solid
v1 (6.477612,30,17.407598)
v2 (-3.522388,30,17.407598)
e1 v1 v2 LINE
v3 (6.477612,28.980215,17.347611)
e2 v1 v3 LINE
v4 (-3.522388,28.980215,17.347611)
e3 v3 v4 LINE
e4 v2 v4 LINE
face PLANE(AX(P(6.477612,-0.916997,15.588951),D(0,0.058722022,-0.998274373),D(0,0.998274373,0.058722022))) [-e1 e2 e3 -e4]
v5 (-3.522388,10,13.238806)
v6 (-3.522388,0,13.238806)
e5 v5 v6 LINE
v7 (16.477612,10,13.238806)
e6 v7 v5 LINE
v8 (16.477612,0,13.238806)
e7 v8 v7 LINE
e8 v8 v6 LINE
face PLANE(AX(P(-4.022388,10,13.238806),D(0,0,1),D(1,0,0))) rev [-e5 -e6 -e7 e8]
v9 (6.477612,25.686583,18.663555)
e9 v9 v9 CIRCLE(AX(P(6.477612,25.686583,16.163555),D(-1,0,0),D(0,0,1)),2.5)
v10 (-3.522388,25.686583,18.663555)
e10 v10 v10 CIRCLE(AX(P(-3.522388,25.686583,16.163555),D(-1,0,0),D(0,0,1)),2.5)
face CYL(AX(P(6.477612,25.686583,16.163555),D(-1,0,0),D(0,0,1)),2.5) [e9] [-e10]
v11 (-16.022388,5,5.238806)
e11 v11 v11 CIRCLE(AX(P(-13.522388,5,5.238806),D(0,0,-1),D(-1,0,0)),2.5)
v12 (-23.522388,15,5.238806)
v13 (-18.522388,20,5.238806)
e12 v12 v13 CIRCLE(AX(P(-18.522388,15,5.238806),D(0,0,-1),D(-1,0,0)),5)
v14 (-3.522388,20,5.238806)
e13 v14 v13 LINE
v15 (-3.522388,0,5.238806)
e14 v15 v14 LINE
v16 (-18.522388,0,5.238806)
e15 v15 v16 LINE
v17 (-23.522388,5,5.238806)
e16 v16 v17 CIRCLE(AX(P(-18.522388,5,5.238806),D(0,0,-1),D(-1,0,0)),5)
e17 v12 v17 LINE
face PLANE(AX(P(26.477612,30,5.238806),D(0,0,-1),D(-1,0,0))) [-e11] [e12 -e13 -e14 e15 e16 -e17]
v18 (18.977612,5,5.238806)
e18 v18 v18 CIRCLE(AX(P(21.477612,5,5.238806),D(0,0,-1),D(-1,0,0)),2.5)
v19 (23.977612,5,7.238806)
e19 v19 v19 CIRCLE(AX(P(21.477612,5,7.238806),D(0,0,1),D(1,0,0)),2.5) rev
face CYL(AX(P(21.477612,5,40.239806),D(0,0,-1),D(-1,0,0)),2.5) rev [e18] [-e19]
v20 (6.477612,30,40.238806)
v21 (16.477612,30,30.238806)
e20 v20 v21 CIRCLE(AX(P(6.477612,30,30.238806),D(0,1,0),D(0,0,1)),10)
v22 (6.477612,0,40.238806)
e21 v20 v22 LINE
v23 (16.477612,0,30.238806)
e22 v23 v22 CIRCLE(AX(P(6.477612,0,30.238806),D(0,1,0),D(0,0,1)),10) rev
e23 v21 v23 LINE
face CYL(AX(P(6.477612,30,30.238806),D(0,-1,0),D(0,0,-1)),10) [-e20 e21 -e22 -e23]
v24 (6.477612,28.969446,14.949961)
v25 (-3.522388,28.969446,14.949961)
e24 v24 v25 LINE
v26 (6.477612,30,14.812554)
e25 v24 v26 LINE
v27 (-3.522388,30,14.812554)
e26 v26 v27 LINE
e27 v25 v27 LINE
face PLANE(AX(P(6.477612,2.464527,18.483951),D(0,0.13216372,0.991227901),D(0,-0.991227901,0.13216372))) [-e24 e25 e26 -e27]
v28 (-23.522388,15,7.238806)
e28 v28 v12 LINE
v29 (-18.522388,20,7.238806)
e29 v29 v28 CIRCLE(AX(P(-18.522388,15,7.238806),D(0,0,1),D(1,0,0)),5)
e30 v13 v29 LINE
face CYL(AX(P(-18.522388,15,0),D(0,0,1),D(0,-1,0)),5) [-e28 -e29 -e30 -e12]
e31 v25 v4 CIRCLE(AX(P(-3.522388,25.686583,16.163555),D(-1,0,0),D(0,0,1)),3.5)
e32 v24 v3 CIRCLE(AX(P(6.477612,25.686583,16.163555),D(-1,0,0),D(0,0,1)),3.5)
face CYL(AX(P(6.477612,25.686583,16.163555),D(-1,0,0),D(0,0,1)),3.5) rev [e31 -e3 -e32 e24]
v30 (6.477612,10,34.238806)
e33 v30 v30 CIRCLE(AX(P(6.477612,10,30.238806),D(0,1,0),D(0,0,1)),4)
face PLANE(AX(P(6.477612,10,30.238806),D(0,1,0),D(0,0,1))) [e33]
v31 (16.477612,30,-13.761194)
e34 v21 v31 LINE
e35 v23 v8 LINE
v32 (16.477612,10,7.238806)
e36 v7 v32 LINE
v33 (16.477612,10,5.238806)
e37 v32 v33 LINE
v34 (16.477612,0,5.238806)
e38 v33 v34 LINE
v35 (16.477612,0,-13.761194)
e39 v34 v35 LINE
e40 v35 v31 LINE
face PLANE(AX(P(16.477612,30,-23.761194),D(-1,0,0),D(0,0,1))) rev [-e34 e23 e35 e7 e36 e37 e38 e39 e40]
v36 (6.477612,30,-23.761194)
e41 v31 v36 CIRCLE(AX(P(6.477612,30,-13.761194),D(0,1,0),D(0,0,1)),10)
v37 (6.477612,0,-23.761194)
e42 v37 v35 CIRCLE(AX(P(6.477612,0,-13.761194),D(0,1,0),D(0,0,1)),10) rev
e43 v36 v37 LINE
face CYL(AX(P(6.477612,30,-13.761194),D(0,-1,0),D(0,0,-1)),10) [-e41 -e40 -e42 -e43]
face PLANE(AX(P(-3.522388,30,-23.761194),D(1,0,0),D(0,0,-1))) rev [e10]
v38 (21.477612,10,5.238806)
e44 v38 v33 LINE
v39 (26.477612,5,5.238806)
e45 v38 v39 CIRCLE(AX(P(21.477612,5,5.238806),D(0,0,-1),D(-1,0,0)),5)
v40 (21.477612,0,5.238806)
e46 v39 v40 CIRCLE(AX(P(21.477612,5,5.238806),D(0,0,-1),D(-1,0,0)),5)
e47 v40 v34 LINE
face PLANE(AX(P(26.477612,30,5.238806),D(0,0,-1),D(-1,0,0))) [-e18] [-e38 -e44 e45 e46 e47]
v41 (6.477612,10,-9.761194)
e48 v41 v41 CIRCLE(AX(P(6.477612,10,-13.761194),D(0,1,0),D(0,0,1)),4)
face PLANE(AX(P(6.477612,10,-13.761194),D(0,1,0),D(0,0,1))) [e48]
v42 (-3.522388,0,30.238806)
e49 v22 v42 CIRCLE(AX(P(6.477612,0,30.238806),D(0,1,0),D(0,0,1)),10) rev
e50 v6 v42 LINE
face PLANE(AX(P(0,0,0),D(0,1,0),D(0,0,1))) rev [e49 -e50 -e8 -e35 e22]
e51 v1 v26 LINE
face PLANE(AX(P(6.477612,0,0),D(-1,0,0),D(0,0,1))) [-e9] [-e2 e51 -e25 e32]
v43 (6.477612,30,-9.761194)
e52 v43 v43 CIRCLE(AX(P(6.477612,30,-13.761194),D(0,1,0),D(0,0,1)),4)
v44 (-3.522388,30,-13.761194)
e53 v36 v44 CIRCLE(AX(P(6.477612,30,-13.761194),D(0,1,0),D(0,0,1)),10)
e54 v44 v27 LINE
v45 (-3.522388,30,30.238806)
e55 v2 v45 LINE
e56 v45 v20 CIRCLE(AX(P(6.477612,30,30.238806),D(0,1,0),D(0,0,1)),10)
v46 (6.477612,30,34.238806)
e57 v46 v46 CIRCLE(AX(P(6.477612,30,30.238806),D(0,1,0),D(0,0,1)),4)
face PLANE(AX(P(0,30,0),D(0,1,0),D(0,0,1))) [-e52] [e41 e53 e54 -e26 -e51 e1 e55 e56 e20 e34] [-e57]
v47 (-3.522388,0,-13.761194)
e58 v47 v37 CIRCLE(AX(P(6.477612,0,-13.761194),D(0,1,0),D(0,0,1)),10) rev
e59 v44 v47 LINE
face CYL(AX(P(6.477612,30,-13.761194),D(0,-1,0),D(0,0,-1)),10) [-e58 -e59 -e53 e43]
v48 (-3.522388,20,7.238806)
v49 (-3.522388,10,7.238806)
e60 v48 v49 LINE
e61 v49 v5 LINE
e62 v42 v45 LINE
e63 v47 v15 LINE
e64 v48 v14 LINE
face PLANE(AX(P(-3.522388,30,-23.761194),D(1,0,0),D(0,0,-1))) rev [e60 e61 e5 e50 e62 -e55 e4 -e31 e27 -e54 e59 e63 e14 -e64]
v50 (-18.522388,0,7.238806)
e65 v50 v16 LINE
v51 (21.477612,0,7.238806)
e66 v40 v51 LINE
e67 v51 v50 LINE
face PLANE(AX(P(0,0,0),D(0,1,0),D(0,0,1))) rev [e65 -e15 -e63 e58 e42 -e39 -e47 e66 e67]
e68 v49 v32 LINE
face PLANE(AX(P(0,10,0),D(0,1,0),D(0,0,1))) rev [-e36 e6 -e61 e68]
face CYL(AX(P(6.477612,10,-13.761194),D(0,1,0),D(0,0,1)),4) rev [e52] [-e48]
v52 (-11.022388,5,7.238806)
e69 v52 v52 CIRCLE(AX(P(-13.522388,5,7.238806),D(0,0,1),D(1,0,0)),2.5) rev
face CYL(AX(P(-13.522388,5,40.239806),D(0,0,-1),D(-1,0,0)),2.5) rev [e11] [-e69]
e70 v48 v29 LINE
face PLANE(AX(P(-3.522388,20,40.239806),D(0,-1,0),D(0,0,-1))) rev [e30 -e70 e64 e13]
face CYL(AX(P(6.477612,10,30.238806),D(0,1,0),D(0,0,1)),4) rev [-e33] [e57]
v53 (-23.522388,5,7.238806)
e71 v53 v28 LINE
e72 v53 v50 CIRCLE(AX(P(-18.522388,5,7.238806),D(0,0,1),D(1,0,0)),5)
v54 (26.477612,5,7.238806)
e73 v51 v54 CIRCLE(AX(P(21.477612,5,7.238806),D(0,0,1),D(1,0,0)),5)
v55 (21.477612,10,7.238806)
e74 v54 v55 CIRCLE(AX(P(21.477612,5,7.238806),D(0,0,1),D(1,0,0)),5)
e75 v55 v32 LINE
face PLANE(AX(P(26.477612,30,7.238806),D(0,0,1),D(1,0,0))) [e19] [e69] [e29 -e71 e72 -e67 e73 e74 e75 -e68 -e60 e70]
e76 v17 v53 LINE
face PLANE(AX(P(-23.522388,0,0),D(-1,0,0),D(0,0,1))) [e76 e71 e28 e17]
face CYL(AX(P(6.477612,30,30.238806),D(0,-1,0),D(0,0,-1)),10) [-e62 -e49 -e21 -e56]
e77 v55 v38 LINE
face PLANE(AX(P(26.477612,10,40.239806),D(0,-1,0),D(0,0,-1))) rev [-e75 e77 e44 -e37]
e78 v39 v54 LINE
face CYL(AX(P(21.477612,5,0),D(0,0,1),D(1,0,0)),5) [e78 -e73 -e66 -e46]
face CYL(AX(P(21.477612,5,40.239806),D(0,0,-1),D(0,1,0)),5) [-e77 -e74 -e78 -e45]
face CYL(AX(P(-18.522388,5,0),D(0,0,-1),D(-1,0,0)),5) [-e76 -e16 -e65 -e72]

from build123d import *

# Parameters (mm, degrees)
SKETCH2_W                = 20
SKETCH2_H                = 64
BOSS_EXTRUDE1_DEPTH      = 30
SKETCH3_R                = 4
CUT_EXTRUDE1_DEPTH       = 20
SKETCH4_R                = 2.5
CUT_EXTRUDE2_DEPTH       = 10
FILLET1_R                = 10
BOSS_EXTRUDE2_DEPTH      = 20
BOSS_EXTRUDE2_DEPTH_BACK = 30
SKETCH5_W                = 2
SKETCH5_H                = 30
CUT_EXTRUDE3_REACH       = 55.161
SKETCH6_R                = 2.5
SKETCH6_W                = 10
SKETCH6_H                = 20
SKETCH6_W_2              = 20
SKETCH6_H_2              = 10
FILLET2_R                = 5
SKETCH7_W                = 21
SKETCH7_H                = 6
CUT_EXTRUDE4_DEPTH       = 10


with BuildPart() as part:
    # Sketch2 → Boss-Extrude1 (new body)
    with BuildSketch(Plane(origin=(0, 0, 0), x_dir=(1, 0, 0), z_dir=(0, 1, 0))):
        with Locations((6.47761194, -8.23880597)):
            Rectangle(SKETCH2_W, SKETCH2_H)
    extrude(amount=BOSS_EXTRUDE1_DEPTH)

    # Sketch3 → Cut-Extrude1 (cut)
    with BuildSketch(Plane(origin=(0, 30, 0), x_dir=(1, 0, 0), z_dir=(0, 1, 0))):
        with Locations(Location((6.47761194, 13.76119403, 0), (0, 0, 270))):
            Circle(SKETCH3_R)
        with Locations(Location((6.47761194, -30.23880597, 0), (0, 0, 270))):
            Circle(SKETCH3_R)
    extrude(amount=-CUT_EXTRUDE1_DEPTH, mode=Mode.SUBTRACT)

    # Sketch4 → Cut-Extrude2 (cut)
    with BuildSketch(Plane.ZY.offset(3.52238806)):
        with BuildLine():
            Line((17.415034126, 30.126407987), (14.795699792, 30.126407987))
            Line((14.795699792, 30.126407987), (14.949961333, 28.969446425))
            ThreePointArc((14.949961333, 28.969446425), (16.17927412, 22.186618473), (17.347611009, 28.980215007))
            Line((17.347611009, 28.980215007), (17.415034126, 30.126407987))
        make_face()
        with Locations((16.163554702, 25.686583173)):
            Circle(SKETCH4_R, mode=Mode.SUBTRACT)
    extrude(amount=-CUT_EXTRUDE2_DEPTH, mode=Mode.SUBTRACT)

    # Fillet1
    fillet1_edges = [part.edges().sort_by_distance(p)[0] for p in [
        (-3.52238806, 15, -23.76119403),
        (16.47761194, 15, -23.76119403),
        (16.47761194, 15, 40.23880597),
        (-3.52238806, 15, 40.23880597),
    ]]
    fillet(fillet1_edges, radius=FILLET1_R - 0.0001)  # a hair under: the kernel refuses the full size

    # Sketch5 → Boss-Extrude2 (add, two sides: drawn at the far end of the back side and taken through both)
    with BuildSketch(Plane.ZY.offset(3.52238806).offset(-BOSS_EXTRUDE2_DEPTH_BACK)):
        with Locations((6.23880597, 15)):
            Rectangle(SKETCH5_W, SKETCH5_H)
    extrude(amount=BOSS_EXTRUDE2_DEPTH + BOSS_EXTRUDE2_DEPTH_BACK)

    # Sketch6 → Cut-Extrude3 (cut, up to next)
    with BuildSketch(Plane(origin=(0, 0, 5.23880597), x_dir=(-1, 0, 0), z_dir=(0, 0, -1)), mode=Mode.PRIVATE) as cut_extrude3_sk1:
        with Locations((-21.47761194, 5)):
            Circle(SKETCH6_R)
    cut_extrude3_tool1 = extrude(cut_extrude3_sk1.sketch, amount=-CUT_EXTRUDE3_REACH, mode=Mode.PRIVATE) & part.part
    # Sketch6 → Cut-Extrude3 (cut, up to next)
    with BuildSketch(Plane(origin=(0, 0, 5.23880597), x_dir=(-1, 0, 0), z_dir=(0, 0, -1)), mode=Mode.PRIVATE) as cut_extrude3_sk2:
        with Locations((13.52238806, 5)):
            Circle(SKETCH6_R)
    cut_extrude3_tool2 = extrude(cut_extrude3_sk2.sketch, amount=-CUT_EXTRUDE3_REACH, mode=Mode.PRIVATE) & part.part
    # Sketch6 → Cut-Extrude3 (cut, up to next)
    with BuildSketch(Plane(origin=(0, 0, 5.23880597), x_dir=(-1, 0, 0), z_dir=(0, 0, -1)), mode=Mode.PRIVATE) as cut_extrude3_sk3:
        with Locations((-21.47761194, 20)):
            Rectangle(SKETCH6_W, SKETCH6_H)
    cut_extrude3_tool3 = extrude(cut_extrude3_sk3.sketch, amount=-CUT_EXTRUDE3_REACH, mode=Mode.PRIVATE) & part.part
    # Sketch6 → Cut-Extrude3 (cut, up to next)
    with BuildSketch(Plane(origin=(0, 0, 5.23880597), x_dir=(-1, 0, 0), z_dir=(0, 0, -1)), mode=Mode.PRIVATE) as cut_extrude3_sk4:
        with Locations((13.52238806, 25)):
            Rectangle(SKETCH6_W_2, SKETCH6_H_2)
    cut_extrude3_tool4 = extrude(cut_extrude3_sk4.sketch, amount=-CUT_EXTRUDE3_REACH, mode=Mode.PRIVATE) & part.part
    add(cut_extrude3_tool1.solids().sort_by_distance((21.477612, 5, 5.238806))[0], mode=Mode.SUBTRACT)
    add(cut_extrude3_tool2.solids().sort_by_distance((-13.522388, 5, 5.238806))[0], mode=Mode.SUBTRACT)
    add(cut_extrude3_tool3.solids().sort_by_distance((21.477612, 20, 5.238806))[0], mode=Mode.SUBTRACT)
    add(cut_extrude3_tool4.solids().sort_by_distance((-13.522388, 25, 5.238806))[0], mode=Mode.SUBTRACT)

    # Fillet2
    fillet2_edges = [part.edges().sort_by_distance(p)[0] for p in [
        (-23.52238806, 20, 6.23880597),
        (-23.52238806, 0, 6.23880597),
        (26.47761194, 0, 6.23880597),
        (26.47761194, 10, 6.23880597),
    ]]
    fillet(fillet2_edges, radius=FILLET2_R - 0.0001)  # a hair under: the kernel refuses the full size

    # Sketch7 → Cut-Extrude4 (cut)
    with BuildSketch(Plane(origin=(0, 0, 0), x_dir=(-1, 0, 0), z_dir=(0, -1, 0))):
        with Locations((-6.47761194, -10.23880597)):
            Rectangle(SKETCH7_W, SKETCH7_H)
    extrude(amount=-CUT_EXTRUDE4_DEPTH, mode=Mode.SUBTRACT)


solid = part.part
